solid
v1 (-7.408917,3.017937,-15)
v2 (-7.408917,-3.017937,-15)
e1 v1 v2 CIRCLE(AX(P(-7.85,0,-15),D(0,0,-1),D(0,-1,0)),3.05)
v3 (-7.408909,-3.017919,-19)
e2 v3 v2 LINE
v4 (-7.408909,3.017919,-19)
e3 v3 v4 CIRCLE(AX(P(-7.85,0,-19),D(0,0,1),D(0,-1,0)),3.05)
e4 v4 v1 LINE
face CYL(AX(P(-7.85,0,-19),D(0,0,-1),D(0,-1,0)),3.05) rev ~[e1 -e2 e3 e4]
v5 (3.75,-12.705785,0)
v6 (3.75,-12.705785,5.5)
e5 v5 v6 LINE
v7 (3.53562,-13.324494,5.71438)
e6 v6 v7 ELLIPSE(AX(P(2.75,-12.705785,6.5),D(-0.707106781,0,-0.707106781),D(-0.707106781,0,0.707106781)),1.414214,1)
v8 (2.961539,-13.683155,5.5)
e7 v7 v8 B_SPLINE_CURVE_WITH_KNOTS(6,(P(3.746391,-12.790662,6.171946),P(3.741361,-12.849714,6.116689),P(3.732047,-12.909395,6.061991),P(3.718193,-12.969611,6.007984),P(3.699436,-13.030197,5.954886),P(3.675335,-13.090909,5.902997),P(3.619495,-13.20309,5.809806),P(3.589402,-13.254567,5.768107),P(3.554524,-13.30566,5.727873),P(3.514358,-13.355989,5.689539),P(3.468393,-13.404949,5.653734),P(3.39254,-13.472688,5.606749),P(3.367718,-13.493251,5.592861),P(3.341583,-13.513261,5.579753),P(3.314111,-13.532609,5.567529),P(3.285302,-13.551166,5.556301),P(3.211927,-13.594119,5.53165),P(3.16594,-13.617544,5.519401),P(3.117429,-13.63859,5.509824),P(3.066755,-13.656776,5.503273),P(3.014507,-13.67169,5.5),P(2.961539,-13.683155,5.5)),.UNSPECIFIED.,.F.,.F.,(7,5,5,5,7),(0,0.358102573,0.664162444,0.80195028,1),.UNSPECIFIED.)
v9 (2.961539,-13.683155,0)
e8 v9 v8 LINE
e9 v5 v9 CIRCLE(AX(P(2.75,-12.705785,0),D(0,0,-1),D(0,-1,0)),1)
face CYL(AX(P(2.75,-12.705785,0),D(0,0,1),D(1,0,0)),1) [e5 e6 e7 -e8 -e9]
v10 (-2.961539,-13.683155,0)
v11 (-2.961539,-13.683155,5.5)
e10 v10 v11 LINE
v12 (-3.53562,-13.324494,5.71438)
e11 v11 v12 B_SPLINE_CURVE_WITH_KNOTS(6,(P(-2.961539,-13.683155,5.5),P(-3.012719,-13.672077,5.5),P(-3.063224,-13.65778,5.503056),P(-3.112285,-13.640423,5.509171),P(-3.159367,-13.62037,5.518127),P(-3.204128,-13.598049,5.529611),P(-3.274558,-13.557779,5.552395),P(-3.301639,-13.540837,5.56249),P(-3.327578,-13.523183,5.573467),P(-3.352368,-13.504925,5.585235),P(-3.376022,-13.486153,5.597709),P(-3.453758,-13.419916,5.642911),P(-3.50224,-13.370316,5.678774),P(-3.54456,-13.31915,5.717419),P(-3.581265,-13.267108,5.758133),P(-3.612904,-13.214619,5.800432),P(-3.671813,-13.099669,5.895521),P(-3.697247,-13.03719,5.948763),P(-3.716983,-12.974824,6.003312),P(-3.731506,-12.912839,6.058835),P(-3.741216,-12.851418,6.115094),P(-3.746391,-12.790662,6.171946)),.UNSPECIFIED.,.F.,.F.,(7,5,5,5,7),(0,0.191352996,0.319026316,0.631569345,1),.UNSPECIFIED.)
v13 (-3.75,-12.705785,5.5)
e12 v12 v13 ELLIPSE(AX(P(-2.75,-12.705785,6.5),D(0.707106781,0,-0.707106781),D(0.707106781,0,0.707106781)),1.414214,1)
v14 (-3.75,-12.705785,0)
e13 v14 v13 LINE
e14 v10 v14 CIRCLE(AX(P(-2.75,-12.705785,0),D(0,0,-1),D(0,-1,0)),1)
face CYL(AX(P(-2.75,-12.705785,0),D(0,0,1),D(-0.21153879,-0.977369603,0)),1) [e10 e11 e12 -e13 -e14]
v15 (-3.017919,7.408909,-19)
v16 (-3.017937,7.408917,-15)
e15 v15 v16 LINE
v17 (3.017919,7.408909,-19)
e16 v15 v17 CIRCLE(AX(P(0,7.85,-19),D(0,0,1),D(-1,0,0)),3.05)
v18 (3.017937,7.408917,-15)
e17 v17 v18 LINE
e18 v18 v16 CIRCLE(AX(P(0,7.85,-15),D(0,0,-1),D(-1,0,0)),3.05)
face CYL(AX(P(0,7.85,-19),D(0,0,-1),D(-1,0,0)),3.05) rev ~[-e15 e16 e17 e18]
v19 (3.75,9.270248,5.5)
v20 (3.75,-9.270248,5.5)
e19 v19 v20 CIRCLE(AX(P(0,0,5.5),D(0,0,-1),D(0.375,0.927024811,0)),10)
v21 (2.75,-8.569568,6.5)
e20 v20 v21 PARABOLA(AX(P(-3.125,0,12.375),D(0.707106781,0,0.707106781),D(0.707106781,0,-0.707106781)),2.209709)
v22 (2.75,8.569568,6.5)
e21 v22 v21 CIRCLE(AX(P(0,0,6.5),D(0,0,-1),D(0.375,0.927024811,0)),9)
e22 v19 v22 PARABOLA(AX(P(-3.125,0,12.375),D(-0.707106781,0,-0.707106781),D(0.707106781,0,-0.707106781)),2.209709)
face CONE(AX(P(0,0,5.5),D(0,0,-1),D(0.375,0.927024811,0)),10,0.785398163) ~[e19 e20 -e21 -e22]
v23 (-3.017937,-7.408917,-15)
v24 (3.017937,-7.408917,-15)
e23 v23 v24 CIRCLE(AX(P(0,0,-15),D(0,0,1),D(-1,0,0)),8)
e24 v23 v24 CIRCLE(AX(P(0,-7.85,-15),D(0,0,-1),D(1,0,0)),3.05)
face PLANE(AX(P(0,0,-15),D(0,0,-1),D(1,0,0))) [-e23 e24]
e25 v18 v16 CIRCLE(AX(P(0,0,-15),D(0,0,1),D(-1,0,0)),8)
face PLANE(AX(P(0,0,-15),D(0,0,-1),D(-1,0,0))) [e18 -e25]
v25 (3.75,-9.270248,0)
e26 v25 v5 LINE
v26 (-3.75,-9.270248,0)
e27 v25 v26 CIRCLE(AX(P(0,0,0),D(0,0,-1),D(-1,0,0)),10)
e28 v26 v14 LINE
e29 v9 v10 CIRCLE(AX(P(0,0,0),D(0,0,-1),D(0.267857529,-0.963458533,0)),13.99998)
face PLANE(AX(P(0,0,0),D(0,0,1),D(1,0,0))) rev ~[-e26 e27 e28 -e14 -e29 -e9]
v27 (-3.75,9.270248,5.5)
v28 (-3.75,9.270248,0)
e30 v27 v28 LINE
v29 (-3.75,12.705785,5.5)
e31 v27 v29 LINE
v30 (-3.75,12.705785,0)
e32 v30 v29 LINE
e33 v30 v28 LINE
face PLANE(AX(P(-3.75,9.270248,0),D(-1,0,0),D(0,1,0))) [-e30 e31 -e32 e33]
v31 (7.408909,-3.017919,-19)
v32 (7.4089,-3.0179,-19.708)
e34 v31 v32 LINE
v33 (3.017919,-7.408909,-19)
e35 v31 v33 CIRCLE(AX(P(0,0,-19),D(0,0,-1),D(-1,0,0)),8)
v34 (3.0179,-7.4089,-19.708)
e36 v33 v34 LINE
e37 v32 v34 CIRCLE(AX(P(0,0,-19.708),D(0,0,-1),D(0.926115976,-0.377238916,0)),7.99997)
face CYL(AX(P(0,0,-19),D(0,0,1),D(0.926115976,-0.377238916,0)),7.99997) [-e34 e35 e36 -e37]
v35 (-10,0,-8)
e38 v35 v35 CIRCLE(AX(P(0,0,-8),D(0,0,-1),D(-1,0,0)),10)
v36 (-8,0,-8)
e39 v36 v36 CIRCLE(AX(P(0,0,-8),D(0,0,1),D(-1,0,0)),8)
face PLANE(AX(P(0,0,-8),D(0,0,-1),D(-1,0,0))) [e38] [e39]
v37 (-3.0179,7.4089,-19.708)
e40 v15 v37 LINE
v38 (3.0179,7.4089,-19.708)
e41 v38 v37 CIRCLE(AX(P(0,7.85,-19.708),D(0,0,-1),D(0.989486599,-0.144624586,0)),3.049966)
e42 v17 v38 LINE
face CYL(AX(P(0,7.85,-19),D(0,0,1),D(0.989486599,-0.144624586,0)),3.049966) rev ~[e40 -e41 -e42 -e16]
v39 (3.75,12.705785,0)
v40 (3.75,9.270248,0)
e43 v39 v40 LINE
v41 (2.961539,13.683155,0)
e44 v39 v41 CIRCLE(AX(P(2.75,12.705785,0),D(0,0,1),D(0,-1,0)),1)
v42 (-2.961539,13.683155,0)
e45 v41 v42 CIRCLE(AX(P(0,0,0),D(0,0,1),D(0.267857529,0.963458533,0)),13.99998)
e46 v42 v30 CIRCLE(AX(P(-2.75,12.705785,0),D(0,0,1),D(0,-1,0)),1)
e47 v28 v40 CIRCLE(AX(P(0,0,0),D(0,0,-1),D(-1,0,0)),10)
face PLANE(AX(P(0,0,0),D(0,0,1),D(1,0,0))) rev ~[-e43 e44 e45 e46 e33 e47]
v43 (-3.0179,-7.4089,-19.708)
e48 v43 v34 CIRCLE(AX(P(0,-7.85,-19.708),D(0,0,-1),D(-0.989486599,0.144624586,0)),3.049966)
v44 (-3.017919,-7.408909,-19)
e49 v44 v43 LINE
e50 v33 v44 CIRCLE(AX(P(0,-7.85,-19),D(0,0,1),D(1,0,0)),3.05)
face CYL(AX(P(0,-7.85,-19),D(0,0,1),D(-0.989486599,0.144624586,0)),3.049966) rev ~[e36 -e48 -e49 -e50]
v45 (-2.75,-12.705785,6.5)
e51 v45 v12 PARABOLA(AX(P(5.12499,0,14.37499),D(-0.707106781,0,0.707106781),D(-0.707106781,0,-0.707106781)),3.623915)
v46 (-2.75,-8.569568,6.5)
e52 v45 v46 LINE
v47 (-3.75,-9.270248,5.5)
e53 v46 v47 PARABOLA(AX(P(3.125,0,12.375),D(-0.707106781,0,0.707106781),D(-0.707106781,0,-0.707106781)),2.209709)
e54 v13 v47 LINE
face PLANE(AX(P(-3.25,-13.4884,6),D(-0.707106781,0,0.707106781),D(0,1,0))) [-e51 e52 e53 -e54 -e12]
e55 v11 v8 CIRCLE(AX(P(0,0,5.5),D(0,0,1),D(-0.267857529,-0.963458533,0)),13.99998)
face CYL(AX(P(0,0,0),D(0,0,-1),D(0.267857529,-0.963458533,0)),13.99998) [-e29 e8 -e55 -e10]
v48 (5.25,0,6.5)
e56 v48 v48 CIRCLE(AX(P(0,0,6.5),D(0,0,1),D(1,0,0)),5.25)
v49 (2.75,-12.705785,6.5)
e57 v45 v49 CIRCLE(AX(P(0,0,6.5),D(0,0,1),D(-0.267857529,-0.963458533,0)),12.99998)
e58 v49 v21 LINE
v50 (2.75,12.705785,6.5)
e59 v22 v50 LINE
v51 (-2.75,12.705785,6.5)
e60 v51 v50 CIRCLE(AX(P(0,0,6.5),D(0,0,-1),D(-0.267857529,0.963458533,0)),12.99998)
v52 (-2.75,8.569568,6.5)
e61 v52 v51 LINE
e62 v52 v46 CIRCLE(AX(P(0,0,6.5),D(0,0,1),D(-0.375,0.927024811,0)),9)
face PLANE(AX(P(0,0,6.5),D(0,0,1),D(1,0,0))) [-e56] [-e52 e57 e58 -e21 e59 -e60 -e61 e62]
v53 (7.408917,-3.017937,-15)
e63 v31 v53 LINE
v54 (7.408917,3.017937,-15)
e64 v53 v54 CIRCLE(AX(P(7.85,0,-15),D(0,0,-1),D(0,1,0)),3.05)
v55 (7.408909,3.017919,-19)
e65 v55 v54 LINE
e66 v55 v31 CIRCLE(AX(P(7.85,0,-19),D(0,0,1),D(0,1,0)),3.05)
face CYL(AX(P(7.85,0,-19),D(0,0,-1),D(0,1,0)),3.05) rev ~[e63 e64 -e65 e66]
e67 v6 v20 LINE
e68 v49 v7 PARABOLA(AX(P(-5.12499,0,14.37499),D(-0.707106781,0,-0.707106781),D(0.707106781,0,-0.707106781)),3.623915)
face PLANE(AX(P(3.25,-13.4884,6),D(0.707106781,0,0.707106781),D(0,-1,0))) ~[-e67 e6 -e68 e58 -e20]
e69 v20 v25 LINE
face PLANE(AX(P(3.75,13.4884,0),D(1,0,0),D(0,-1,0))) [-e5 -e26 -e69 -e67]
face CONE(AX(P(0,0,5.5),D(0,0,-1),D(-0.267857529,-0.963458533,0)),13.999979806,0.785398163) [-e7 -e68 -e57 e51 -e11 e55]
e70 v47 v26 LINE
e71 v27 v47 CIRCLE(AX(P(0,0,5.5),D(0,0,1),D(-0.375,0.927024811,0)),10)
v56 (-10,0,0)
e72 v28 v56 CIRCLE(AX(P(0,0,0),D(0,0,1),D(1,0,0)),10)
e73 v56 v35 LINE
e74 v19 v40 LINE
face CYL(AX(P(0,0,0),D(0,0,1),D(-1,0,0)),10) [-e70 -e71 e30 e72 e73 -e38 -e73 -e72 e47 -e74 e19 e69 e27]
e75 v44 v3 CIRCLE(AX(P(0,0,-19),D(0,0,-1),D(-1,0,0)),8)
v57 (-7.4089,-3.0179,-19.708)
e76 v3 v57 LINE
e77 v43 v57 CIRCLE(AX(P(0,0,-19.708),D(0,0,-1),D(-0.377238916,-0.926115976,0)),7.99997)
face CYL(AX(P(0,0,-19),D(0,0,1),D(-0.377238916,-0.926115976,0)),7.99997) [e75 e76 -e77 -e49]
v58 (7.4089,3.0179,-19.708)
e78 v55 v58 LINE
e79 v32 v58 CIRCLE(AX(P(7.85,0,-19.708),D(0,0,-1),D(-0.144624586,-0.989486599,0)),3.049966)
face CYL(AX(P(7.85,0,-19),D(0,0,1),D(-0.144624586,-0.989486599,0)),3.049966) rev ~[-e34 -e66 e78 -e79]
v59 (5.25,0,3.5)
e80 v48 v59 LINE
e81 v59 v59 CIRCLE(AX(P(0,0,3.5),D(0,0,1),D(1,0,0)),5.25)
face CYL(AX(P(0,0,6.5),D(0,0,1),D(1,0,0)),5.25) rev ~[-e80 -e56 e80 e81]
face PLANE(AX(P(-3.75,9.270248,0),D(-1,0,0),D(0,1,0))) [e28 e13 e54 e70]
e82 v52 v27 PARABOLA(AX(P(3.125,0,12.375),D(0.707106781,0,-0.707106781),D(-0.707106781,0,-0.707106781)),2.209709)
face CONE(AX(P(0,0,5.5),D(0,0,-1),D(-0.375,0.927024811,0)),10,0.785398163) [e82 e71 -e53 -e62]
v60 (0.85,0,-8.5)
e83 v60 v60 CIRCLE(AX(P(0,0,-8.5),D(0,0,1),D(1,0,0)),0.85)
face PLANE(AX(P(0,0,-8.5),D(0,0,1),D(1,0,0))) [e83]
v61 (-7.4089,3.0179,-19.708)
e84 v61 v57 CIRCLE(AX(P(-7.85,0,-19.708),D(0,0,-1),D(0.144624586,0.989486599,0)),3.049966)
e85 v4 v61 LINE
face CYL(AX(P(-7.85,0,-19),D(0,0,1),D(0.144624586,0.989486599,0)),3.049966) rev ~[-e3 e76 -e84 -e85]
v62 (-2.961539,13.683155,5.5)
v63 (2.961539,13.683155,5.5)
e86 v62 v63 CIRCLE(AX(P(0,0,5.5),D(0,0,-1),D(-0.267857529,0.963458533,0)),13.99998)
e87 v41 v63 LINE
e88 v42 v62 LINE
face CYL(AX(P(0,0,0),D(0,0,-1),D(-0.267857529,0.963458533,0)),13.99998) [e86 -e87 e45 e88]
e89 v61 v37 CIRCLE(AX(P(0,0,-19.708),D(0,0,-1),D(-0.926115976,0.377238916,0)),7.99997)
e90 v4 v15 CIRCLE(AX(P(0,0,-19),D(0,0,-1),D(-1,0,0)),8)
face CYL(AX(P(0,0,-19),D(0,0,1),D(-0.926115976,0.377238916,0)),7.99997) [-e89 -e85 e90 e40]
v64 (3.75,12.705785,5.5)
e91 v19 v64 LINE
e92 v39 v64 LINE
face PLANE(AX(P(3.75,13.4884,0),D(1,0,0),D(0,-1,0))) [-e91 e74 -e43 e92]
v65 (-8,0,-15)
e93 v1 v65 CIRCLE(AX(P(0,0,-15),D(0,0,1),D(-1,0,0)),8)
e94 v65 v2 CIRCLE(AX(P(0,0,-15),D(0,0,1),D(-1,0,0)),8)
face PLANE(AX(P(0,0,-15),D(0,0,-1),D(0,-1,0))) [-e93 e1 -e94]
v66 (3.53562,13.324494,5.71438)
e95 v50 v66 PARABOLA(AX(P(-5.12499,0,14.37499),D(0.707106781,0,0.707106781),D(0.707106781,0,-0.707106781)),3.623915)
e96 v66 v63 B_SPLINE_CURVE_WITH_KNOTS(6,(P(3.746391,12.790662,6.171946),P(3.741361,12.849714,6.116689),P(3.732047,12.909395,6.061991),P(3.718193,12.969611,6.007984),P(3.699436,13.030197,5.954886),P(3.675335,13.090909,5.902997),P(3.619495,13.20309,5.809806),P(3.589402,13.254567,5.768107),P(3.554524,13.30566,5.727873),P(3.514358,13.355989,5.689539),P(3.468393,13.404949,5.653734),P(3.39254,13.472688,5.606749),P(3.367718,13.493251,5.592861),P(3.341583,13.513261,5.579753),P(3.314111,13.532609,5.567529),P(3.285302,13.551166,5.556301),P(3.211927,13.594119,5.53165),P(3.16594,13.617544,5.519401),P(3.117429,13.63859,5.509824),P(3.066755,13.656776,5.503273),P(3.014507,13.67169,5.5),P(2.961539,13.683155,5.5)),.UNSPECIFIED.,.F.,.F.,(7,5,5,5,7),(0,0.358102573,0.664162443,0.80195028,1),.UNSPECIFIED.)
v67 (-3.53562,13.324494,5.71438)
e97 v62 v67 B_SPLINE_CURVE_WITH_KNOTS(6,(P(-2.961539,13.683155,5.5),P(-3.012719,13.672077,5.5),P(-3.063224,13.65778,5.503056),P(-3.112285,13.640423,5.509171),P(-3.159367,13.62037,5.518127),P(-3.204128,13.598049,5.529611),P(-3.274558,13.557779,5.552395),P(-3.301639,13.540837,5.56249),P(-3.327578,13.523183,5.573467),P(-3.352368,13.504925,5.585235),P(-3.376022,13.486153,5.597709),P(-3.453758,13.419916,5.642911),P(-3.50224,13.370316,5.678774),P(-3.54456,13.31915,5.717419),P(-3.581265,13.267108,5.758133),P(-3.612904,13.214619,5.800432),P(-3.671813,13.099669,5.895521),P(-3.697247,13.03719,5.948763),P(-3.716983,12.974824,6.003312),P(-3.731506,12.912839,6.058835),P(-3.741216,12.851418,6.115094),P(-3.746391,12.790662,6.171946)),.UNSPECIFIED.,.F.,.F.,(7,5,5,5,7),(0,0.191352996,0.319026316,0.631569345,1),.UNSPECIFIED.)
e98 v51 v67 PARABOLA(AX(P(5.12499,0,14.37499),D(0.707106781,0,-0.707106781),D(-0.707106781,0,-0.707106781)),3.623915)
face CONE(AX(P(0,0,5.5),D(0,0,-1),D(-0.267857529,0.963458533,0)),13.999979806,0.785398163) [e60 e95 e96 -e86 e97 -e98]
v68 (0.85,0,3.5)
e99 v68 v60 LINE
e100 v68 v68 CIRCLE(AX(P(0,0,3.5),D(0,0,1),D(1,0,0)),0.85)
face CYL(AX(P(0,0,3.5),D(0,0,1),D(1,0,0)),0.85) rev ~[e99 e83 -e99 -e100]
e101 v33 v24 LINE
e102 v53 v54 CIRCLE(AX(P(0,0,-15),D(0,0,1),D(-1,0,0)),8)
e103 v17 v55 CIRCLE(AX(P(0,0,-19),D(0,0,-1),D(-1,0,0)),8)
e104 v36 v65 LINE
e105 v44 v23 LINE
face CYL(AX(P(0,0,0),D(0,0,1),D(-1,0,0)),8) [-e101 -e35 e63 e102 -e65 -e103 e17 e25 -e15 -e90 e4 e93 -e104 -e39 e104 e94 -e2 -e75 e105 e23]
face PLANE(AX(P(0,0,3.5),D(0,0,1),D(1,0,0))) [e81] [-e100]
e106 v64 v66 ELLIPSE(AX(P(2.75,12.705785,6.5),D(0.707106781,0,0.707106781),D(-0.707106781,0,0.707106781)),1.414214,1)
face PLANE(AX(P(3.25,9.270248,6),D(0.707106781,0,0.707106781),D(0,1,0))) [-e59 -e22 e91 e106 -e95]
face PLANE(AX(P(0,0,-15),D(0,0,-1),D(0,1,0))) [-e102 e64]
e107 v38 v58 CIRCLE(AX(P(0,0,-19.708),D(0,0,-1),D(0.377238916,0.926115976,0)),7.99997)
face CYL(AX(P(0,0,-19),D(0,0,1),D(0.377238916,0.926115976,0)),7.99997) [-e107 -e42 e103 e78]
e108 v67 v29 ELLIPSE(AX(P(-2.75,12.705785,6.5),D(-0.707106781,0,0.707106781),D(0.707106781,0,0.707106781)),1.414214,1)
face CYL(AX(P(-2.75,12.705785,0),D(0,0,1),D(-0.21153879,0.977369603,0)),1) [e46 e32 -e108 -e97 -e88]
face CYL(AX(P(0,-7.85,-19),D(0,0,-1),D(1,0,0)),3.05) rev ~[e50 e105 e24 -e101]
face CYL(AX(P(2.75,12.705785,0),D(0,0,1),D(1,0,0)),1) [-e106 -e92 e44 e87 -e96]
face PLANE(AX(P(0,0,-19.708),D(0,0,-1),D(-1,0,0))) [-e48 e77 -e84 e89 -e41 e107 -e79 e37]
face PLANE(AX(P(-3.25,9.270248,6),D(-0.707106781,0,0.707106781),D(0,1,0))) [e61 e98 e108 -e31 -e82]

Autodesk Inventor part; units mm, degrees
ref_plane "YZ Plane" through (0, 0, 0) normal (1, 0, 0) x (0, 1, 0)
ref_plane "XZ Plane" through (0, 0, 0) normal (0, 1, 0) x (-1, 0, 0)
ref_plane "XY Plane" through (0, 0, 0) normal (0, 0, 1) x (1, 0, 0)
sketch "スケッチ1" plane through (0, 0, 0) normal (0, 0, 1) x (1, 0, 0)
  circle A0 centre (0, 0) radius 10
  dimension "d0" = 20
extrude "押し出し1" add sketch "スケッチ1" along normal blind 6.5
sketch "スケッチ2" plane through (0, 0, 0) normal (0, 0, -1) x (-1, 0, 0)
  arc A0 (3.75, 13.4884) -> (-3.75, 13.4884) centre (0, 0) ccw
  arc A1 (-3.75, -13.4884) -> (3.75, -13.4884) centre (0, 0) ccw
  circle A2 centre (0, 0) radius 10 projected
  line L0 (-3.75, 13.4884) -> (-3.75, -13.4884)
  line L1 (3.75, -13.4884) -> (3.75, 13.4884)
  line L2 (0, -19.6) -> (0, 19.6) projected
  line L3 (14, 0) -> (-14, 0) projected
  point P0 (0, 14)
  point P1 (0, -14)
  point P2 (-3.75, 0)
  dimension "d3" = 14
  dimension "d4" = 7.5
extrude "押し出し2" add sketch "スケッチ2" against normal up to surface (6.5 mm away) contours L1 A2 L2 A0 | L2 A2 L0 A0 | L1 L3 L2 A2 | L2 L3 L0 A2 | L1 A2 L2 L3 | L2 A2 L0 L3 | L1 A1 L2 A2 | L2 A1 L0 A2
chamfer "面取り1" distance 1 angle 45 8 edges at (-10, 0, 6.5) (10, 0, 6.5) (-3.75, 11.3793, 6.5) (0, 14, 6.5) (3.75, 11.3793, 6.5) (3.75, -11.3793, 6.5) (0, -14, 6.5) (-3.75, -11.3793, 6.5)
fillet "フィレット1" radius 1 4 edges at (-3.75, -13.4884, 2.75) (3.75, -13.4884, 2.75) (3.75, 13.4884, 2.75) (-3.75, 13.4884, 2.75)
sketch "スケッチ4" plane through (0, 0, 0) normal (0, 0, -1) x (-1, 0, 0)
  circle A0 centre (0, 0) radius 8
  dimension "d14" = 16
extrude "押し出し4" add sketch "スケッチ4" along normal blind 19
sketch "スケッチ5" plane through (0, 0, 6.5) normal (0, 0, 1) x (1, 0, 0)
  circle A0 centre (0, 0) radius 5.25
  dimension "d17" = 10.5
extrude "押し出し5" cut sketch "スケッチ5" against normal blind 3
sketch "スケッチ6" plane through (0, 0, -19) normal (0, 0, -1) x (-1, 0, 0)
  circle A0 centre (0, 7.85) radius 3.05
  line L0 (14, 0) -> (-14, 0) projected
  line L1 (0, -19.6) -> (0, 19.6) projected
  point P0 (0, 0)
  dimension "d20" = 6.1
  dimension "d21" = 7.85
extrude "押し出し6" cut sketch "スケッチ6" against normal blind 4
pattern_circular "円形状パターン1" count 4 over 360 about axis through (0, 0, -10) along (0, 0, 1) of "押し出し6"
sketch "スケッチ7" plane through (0, 0, 0) normal (0, 0, -1) x (-1, 0, 0)
  circle A0 centre (0, 0) radius 5.25 projected
  circle A1 centre (0, 0) radius 10
  point P0 (-3.75, -9.2702)
extrude "押し出し7" add sketch "スケッチ7" along normal blind 8
sketch "スケッチ8" plane through (0, 0, -19) normal (0, 0, -1) x (-1, 0, 0)
  arc A0 (-7.4089, -3.0179) -> (-7.4089, 3.0179) centre (-7.85, 0) ccw projected
  arc A1 (-7.4089, -3.0179) -> (-3.0179, -7.4089) centre (0, 0) ccw projected
  arc A2 (3.0179, -7.4089) -> (-3.0179, -7.4089) centre (0, -7.85) ccw projected
  arc A3 (3.0179, -7.4089) -> (7.4089, -3.0179) centre (0, 0) ccw projected
  arc A4 (7.4089, 3.0179) -> (7.4089, -3.0179) centre (7.85, 0) ccw projected
  arc A5 (7.4089, 3.0179) -> (3.0179, 7.4089) centre (0, 0) ccw projected
  arc A6 (-3.0179, 7.4089) -> (3.0179, 7.4089) centre (0, 7.85) ccw projected
  arc A7 (-3.0179, 7.4089) -> (-7.4089, 3.0179) centre (0, 0) ccw projected
extrude "押し出し8" add sketch "スケッチ8" along normal blind 0.708
sketch "スケッチ9" plane through (0, 0, 3.5) normal (0, 0, 1) x (1, 0, 0)
  circle A0 centre (0, 0) radius 0.85
  dimension "d31" = 1.7
extrude "押し出し9" cut sketch "スケッチ9" against normal blind 12
properties part number "conecter"
